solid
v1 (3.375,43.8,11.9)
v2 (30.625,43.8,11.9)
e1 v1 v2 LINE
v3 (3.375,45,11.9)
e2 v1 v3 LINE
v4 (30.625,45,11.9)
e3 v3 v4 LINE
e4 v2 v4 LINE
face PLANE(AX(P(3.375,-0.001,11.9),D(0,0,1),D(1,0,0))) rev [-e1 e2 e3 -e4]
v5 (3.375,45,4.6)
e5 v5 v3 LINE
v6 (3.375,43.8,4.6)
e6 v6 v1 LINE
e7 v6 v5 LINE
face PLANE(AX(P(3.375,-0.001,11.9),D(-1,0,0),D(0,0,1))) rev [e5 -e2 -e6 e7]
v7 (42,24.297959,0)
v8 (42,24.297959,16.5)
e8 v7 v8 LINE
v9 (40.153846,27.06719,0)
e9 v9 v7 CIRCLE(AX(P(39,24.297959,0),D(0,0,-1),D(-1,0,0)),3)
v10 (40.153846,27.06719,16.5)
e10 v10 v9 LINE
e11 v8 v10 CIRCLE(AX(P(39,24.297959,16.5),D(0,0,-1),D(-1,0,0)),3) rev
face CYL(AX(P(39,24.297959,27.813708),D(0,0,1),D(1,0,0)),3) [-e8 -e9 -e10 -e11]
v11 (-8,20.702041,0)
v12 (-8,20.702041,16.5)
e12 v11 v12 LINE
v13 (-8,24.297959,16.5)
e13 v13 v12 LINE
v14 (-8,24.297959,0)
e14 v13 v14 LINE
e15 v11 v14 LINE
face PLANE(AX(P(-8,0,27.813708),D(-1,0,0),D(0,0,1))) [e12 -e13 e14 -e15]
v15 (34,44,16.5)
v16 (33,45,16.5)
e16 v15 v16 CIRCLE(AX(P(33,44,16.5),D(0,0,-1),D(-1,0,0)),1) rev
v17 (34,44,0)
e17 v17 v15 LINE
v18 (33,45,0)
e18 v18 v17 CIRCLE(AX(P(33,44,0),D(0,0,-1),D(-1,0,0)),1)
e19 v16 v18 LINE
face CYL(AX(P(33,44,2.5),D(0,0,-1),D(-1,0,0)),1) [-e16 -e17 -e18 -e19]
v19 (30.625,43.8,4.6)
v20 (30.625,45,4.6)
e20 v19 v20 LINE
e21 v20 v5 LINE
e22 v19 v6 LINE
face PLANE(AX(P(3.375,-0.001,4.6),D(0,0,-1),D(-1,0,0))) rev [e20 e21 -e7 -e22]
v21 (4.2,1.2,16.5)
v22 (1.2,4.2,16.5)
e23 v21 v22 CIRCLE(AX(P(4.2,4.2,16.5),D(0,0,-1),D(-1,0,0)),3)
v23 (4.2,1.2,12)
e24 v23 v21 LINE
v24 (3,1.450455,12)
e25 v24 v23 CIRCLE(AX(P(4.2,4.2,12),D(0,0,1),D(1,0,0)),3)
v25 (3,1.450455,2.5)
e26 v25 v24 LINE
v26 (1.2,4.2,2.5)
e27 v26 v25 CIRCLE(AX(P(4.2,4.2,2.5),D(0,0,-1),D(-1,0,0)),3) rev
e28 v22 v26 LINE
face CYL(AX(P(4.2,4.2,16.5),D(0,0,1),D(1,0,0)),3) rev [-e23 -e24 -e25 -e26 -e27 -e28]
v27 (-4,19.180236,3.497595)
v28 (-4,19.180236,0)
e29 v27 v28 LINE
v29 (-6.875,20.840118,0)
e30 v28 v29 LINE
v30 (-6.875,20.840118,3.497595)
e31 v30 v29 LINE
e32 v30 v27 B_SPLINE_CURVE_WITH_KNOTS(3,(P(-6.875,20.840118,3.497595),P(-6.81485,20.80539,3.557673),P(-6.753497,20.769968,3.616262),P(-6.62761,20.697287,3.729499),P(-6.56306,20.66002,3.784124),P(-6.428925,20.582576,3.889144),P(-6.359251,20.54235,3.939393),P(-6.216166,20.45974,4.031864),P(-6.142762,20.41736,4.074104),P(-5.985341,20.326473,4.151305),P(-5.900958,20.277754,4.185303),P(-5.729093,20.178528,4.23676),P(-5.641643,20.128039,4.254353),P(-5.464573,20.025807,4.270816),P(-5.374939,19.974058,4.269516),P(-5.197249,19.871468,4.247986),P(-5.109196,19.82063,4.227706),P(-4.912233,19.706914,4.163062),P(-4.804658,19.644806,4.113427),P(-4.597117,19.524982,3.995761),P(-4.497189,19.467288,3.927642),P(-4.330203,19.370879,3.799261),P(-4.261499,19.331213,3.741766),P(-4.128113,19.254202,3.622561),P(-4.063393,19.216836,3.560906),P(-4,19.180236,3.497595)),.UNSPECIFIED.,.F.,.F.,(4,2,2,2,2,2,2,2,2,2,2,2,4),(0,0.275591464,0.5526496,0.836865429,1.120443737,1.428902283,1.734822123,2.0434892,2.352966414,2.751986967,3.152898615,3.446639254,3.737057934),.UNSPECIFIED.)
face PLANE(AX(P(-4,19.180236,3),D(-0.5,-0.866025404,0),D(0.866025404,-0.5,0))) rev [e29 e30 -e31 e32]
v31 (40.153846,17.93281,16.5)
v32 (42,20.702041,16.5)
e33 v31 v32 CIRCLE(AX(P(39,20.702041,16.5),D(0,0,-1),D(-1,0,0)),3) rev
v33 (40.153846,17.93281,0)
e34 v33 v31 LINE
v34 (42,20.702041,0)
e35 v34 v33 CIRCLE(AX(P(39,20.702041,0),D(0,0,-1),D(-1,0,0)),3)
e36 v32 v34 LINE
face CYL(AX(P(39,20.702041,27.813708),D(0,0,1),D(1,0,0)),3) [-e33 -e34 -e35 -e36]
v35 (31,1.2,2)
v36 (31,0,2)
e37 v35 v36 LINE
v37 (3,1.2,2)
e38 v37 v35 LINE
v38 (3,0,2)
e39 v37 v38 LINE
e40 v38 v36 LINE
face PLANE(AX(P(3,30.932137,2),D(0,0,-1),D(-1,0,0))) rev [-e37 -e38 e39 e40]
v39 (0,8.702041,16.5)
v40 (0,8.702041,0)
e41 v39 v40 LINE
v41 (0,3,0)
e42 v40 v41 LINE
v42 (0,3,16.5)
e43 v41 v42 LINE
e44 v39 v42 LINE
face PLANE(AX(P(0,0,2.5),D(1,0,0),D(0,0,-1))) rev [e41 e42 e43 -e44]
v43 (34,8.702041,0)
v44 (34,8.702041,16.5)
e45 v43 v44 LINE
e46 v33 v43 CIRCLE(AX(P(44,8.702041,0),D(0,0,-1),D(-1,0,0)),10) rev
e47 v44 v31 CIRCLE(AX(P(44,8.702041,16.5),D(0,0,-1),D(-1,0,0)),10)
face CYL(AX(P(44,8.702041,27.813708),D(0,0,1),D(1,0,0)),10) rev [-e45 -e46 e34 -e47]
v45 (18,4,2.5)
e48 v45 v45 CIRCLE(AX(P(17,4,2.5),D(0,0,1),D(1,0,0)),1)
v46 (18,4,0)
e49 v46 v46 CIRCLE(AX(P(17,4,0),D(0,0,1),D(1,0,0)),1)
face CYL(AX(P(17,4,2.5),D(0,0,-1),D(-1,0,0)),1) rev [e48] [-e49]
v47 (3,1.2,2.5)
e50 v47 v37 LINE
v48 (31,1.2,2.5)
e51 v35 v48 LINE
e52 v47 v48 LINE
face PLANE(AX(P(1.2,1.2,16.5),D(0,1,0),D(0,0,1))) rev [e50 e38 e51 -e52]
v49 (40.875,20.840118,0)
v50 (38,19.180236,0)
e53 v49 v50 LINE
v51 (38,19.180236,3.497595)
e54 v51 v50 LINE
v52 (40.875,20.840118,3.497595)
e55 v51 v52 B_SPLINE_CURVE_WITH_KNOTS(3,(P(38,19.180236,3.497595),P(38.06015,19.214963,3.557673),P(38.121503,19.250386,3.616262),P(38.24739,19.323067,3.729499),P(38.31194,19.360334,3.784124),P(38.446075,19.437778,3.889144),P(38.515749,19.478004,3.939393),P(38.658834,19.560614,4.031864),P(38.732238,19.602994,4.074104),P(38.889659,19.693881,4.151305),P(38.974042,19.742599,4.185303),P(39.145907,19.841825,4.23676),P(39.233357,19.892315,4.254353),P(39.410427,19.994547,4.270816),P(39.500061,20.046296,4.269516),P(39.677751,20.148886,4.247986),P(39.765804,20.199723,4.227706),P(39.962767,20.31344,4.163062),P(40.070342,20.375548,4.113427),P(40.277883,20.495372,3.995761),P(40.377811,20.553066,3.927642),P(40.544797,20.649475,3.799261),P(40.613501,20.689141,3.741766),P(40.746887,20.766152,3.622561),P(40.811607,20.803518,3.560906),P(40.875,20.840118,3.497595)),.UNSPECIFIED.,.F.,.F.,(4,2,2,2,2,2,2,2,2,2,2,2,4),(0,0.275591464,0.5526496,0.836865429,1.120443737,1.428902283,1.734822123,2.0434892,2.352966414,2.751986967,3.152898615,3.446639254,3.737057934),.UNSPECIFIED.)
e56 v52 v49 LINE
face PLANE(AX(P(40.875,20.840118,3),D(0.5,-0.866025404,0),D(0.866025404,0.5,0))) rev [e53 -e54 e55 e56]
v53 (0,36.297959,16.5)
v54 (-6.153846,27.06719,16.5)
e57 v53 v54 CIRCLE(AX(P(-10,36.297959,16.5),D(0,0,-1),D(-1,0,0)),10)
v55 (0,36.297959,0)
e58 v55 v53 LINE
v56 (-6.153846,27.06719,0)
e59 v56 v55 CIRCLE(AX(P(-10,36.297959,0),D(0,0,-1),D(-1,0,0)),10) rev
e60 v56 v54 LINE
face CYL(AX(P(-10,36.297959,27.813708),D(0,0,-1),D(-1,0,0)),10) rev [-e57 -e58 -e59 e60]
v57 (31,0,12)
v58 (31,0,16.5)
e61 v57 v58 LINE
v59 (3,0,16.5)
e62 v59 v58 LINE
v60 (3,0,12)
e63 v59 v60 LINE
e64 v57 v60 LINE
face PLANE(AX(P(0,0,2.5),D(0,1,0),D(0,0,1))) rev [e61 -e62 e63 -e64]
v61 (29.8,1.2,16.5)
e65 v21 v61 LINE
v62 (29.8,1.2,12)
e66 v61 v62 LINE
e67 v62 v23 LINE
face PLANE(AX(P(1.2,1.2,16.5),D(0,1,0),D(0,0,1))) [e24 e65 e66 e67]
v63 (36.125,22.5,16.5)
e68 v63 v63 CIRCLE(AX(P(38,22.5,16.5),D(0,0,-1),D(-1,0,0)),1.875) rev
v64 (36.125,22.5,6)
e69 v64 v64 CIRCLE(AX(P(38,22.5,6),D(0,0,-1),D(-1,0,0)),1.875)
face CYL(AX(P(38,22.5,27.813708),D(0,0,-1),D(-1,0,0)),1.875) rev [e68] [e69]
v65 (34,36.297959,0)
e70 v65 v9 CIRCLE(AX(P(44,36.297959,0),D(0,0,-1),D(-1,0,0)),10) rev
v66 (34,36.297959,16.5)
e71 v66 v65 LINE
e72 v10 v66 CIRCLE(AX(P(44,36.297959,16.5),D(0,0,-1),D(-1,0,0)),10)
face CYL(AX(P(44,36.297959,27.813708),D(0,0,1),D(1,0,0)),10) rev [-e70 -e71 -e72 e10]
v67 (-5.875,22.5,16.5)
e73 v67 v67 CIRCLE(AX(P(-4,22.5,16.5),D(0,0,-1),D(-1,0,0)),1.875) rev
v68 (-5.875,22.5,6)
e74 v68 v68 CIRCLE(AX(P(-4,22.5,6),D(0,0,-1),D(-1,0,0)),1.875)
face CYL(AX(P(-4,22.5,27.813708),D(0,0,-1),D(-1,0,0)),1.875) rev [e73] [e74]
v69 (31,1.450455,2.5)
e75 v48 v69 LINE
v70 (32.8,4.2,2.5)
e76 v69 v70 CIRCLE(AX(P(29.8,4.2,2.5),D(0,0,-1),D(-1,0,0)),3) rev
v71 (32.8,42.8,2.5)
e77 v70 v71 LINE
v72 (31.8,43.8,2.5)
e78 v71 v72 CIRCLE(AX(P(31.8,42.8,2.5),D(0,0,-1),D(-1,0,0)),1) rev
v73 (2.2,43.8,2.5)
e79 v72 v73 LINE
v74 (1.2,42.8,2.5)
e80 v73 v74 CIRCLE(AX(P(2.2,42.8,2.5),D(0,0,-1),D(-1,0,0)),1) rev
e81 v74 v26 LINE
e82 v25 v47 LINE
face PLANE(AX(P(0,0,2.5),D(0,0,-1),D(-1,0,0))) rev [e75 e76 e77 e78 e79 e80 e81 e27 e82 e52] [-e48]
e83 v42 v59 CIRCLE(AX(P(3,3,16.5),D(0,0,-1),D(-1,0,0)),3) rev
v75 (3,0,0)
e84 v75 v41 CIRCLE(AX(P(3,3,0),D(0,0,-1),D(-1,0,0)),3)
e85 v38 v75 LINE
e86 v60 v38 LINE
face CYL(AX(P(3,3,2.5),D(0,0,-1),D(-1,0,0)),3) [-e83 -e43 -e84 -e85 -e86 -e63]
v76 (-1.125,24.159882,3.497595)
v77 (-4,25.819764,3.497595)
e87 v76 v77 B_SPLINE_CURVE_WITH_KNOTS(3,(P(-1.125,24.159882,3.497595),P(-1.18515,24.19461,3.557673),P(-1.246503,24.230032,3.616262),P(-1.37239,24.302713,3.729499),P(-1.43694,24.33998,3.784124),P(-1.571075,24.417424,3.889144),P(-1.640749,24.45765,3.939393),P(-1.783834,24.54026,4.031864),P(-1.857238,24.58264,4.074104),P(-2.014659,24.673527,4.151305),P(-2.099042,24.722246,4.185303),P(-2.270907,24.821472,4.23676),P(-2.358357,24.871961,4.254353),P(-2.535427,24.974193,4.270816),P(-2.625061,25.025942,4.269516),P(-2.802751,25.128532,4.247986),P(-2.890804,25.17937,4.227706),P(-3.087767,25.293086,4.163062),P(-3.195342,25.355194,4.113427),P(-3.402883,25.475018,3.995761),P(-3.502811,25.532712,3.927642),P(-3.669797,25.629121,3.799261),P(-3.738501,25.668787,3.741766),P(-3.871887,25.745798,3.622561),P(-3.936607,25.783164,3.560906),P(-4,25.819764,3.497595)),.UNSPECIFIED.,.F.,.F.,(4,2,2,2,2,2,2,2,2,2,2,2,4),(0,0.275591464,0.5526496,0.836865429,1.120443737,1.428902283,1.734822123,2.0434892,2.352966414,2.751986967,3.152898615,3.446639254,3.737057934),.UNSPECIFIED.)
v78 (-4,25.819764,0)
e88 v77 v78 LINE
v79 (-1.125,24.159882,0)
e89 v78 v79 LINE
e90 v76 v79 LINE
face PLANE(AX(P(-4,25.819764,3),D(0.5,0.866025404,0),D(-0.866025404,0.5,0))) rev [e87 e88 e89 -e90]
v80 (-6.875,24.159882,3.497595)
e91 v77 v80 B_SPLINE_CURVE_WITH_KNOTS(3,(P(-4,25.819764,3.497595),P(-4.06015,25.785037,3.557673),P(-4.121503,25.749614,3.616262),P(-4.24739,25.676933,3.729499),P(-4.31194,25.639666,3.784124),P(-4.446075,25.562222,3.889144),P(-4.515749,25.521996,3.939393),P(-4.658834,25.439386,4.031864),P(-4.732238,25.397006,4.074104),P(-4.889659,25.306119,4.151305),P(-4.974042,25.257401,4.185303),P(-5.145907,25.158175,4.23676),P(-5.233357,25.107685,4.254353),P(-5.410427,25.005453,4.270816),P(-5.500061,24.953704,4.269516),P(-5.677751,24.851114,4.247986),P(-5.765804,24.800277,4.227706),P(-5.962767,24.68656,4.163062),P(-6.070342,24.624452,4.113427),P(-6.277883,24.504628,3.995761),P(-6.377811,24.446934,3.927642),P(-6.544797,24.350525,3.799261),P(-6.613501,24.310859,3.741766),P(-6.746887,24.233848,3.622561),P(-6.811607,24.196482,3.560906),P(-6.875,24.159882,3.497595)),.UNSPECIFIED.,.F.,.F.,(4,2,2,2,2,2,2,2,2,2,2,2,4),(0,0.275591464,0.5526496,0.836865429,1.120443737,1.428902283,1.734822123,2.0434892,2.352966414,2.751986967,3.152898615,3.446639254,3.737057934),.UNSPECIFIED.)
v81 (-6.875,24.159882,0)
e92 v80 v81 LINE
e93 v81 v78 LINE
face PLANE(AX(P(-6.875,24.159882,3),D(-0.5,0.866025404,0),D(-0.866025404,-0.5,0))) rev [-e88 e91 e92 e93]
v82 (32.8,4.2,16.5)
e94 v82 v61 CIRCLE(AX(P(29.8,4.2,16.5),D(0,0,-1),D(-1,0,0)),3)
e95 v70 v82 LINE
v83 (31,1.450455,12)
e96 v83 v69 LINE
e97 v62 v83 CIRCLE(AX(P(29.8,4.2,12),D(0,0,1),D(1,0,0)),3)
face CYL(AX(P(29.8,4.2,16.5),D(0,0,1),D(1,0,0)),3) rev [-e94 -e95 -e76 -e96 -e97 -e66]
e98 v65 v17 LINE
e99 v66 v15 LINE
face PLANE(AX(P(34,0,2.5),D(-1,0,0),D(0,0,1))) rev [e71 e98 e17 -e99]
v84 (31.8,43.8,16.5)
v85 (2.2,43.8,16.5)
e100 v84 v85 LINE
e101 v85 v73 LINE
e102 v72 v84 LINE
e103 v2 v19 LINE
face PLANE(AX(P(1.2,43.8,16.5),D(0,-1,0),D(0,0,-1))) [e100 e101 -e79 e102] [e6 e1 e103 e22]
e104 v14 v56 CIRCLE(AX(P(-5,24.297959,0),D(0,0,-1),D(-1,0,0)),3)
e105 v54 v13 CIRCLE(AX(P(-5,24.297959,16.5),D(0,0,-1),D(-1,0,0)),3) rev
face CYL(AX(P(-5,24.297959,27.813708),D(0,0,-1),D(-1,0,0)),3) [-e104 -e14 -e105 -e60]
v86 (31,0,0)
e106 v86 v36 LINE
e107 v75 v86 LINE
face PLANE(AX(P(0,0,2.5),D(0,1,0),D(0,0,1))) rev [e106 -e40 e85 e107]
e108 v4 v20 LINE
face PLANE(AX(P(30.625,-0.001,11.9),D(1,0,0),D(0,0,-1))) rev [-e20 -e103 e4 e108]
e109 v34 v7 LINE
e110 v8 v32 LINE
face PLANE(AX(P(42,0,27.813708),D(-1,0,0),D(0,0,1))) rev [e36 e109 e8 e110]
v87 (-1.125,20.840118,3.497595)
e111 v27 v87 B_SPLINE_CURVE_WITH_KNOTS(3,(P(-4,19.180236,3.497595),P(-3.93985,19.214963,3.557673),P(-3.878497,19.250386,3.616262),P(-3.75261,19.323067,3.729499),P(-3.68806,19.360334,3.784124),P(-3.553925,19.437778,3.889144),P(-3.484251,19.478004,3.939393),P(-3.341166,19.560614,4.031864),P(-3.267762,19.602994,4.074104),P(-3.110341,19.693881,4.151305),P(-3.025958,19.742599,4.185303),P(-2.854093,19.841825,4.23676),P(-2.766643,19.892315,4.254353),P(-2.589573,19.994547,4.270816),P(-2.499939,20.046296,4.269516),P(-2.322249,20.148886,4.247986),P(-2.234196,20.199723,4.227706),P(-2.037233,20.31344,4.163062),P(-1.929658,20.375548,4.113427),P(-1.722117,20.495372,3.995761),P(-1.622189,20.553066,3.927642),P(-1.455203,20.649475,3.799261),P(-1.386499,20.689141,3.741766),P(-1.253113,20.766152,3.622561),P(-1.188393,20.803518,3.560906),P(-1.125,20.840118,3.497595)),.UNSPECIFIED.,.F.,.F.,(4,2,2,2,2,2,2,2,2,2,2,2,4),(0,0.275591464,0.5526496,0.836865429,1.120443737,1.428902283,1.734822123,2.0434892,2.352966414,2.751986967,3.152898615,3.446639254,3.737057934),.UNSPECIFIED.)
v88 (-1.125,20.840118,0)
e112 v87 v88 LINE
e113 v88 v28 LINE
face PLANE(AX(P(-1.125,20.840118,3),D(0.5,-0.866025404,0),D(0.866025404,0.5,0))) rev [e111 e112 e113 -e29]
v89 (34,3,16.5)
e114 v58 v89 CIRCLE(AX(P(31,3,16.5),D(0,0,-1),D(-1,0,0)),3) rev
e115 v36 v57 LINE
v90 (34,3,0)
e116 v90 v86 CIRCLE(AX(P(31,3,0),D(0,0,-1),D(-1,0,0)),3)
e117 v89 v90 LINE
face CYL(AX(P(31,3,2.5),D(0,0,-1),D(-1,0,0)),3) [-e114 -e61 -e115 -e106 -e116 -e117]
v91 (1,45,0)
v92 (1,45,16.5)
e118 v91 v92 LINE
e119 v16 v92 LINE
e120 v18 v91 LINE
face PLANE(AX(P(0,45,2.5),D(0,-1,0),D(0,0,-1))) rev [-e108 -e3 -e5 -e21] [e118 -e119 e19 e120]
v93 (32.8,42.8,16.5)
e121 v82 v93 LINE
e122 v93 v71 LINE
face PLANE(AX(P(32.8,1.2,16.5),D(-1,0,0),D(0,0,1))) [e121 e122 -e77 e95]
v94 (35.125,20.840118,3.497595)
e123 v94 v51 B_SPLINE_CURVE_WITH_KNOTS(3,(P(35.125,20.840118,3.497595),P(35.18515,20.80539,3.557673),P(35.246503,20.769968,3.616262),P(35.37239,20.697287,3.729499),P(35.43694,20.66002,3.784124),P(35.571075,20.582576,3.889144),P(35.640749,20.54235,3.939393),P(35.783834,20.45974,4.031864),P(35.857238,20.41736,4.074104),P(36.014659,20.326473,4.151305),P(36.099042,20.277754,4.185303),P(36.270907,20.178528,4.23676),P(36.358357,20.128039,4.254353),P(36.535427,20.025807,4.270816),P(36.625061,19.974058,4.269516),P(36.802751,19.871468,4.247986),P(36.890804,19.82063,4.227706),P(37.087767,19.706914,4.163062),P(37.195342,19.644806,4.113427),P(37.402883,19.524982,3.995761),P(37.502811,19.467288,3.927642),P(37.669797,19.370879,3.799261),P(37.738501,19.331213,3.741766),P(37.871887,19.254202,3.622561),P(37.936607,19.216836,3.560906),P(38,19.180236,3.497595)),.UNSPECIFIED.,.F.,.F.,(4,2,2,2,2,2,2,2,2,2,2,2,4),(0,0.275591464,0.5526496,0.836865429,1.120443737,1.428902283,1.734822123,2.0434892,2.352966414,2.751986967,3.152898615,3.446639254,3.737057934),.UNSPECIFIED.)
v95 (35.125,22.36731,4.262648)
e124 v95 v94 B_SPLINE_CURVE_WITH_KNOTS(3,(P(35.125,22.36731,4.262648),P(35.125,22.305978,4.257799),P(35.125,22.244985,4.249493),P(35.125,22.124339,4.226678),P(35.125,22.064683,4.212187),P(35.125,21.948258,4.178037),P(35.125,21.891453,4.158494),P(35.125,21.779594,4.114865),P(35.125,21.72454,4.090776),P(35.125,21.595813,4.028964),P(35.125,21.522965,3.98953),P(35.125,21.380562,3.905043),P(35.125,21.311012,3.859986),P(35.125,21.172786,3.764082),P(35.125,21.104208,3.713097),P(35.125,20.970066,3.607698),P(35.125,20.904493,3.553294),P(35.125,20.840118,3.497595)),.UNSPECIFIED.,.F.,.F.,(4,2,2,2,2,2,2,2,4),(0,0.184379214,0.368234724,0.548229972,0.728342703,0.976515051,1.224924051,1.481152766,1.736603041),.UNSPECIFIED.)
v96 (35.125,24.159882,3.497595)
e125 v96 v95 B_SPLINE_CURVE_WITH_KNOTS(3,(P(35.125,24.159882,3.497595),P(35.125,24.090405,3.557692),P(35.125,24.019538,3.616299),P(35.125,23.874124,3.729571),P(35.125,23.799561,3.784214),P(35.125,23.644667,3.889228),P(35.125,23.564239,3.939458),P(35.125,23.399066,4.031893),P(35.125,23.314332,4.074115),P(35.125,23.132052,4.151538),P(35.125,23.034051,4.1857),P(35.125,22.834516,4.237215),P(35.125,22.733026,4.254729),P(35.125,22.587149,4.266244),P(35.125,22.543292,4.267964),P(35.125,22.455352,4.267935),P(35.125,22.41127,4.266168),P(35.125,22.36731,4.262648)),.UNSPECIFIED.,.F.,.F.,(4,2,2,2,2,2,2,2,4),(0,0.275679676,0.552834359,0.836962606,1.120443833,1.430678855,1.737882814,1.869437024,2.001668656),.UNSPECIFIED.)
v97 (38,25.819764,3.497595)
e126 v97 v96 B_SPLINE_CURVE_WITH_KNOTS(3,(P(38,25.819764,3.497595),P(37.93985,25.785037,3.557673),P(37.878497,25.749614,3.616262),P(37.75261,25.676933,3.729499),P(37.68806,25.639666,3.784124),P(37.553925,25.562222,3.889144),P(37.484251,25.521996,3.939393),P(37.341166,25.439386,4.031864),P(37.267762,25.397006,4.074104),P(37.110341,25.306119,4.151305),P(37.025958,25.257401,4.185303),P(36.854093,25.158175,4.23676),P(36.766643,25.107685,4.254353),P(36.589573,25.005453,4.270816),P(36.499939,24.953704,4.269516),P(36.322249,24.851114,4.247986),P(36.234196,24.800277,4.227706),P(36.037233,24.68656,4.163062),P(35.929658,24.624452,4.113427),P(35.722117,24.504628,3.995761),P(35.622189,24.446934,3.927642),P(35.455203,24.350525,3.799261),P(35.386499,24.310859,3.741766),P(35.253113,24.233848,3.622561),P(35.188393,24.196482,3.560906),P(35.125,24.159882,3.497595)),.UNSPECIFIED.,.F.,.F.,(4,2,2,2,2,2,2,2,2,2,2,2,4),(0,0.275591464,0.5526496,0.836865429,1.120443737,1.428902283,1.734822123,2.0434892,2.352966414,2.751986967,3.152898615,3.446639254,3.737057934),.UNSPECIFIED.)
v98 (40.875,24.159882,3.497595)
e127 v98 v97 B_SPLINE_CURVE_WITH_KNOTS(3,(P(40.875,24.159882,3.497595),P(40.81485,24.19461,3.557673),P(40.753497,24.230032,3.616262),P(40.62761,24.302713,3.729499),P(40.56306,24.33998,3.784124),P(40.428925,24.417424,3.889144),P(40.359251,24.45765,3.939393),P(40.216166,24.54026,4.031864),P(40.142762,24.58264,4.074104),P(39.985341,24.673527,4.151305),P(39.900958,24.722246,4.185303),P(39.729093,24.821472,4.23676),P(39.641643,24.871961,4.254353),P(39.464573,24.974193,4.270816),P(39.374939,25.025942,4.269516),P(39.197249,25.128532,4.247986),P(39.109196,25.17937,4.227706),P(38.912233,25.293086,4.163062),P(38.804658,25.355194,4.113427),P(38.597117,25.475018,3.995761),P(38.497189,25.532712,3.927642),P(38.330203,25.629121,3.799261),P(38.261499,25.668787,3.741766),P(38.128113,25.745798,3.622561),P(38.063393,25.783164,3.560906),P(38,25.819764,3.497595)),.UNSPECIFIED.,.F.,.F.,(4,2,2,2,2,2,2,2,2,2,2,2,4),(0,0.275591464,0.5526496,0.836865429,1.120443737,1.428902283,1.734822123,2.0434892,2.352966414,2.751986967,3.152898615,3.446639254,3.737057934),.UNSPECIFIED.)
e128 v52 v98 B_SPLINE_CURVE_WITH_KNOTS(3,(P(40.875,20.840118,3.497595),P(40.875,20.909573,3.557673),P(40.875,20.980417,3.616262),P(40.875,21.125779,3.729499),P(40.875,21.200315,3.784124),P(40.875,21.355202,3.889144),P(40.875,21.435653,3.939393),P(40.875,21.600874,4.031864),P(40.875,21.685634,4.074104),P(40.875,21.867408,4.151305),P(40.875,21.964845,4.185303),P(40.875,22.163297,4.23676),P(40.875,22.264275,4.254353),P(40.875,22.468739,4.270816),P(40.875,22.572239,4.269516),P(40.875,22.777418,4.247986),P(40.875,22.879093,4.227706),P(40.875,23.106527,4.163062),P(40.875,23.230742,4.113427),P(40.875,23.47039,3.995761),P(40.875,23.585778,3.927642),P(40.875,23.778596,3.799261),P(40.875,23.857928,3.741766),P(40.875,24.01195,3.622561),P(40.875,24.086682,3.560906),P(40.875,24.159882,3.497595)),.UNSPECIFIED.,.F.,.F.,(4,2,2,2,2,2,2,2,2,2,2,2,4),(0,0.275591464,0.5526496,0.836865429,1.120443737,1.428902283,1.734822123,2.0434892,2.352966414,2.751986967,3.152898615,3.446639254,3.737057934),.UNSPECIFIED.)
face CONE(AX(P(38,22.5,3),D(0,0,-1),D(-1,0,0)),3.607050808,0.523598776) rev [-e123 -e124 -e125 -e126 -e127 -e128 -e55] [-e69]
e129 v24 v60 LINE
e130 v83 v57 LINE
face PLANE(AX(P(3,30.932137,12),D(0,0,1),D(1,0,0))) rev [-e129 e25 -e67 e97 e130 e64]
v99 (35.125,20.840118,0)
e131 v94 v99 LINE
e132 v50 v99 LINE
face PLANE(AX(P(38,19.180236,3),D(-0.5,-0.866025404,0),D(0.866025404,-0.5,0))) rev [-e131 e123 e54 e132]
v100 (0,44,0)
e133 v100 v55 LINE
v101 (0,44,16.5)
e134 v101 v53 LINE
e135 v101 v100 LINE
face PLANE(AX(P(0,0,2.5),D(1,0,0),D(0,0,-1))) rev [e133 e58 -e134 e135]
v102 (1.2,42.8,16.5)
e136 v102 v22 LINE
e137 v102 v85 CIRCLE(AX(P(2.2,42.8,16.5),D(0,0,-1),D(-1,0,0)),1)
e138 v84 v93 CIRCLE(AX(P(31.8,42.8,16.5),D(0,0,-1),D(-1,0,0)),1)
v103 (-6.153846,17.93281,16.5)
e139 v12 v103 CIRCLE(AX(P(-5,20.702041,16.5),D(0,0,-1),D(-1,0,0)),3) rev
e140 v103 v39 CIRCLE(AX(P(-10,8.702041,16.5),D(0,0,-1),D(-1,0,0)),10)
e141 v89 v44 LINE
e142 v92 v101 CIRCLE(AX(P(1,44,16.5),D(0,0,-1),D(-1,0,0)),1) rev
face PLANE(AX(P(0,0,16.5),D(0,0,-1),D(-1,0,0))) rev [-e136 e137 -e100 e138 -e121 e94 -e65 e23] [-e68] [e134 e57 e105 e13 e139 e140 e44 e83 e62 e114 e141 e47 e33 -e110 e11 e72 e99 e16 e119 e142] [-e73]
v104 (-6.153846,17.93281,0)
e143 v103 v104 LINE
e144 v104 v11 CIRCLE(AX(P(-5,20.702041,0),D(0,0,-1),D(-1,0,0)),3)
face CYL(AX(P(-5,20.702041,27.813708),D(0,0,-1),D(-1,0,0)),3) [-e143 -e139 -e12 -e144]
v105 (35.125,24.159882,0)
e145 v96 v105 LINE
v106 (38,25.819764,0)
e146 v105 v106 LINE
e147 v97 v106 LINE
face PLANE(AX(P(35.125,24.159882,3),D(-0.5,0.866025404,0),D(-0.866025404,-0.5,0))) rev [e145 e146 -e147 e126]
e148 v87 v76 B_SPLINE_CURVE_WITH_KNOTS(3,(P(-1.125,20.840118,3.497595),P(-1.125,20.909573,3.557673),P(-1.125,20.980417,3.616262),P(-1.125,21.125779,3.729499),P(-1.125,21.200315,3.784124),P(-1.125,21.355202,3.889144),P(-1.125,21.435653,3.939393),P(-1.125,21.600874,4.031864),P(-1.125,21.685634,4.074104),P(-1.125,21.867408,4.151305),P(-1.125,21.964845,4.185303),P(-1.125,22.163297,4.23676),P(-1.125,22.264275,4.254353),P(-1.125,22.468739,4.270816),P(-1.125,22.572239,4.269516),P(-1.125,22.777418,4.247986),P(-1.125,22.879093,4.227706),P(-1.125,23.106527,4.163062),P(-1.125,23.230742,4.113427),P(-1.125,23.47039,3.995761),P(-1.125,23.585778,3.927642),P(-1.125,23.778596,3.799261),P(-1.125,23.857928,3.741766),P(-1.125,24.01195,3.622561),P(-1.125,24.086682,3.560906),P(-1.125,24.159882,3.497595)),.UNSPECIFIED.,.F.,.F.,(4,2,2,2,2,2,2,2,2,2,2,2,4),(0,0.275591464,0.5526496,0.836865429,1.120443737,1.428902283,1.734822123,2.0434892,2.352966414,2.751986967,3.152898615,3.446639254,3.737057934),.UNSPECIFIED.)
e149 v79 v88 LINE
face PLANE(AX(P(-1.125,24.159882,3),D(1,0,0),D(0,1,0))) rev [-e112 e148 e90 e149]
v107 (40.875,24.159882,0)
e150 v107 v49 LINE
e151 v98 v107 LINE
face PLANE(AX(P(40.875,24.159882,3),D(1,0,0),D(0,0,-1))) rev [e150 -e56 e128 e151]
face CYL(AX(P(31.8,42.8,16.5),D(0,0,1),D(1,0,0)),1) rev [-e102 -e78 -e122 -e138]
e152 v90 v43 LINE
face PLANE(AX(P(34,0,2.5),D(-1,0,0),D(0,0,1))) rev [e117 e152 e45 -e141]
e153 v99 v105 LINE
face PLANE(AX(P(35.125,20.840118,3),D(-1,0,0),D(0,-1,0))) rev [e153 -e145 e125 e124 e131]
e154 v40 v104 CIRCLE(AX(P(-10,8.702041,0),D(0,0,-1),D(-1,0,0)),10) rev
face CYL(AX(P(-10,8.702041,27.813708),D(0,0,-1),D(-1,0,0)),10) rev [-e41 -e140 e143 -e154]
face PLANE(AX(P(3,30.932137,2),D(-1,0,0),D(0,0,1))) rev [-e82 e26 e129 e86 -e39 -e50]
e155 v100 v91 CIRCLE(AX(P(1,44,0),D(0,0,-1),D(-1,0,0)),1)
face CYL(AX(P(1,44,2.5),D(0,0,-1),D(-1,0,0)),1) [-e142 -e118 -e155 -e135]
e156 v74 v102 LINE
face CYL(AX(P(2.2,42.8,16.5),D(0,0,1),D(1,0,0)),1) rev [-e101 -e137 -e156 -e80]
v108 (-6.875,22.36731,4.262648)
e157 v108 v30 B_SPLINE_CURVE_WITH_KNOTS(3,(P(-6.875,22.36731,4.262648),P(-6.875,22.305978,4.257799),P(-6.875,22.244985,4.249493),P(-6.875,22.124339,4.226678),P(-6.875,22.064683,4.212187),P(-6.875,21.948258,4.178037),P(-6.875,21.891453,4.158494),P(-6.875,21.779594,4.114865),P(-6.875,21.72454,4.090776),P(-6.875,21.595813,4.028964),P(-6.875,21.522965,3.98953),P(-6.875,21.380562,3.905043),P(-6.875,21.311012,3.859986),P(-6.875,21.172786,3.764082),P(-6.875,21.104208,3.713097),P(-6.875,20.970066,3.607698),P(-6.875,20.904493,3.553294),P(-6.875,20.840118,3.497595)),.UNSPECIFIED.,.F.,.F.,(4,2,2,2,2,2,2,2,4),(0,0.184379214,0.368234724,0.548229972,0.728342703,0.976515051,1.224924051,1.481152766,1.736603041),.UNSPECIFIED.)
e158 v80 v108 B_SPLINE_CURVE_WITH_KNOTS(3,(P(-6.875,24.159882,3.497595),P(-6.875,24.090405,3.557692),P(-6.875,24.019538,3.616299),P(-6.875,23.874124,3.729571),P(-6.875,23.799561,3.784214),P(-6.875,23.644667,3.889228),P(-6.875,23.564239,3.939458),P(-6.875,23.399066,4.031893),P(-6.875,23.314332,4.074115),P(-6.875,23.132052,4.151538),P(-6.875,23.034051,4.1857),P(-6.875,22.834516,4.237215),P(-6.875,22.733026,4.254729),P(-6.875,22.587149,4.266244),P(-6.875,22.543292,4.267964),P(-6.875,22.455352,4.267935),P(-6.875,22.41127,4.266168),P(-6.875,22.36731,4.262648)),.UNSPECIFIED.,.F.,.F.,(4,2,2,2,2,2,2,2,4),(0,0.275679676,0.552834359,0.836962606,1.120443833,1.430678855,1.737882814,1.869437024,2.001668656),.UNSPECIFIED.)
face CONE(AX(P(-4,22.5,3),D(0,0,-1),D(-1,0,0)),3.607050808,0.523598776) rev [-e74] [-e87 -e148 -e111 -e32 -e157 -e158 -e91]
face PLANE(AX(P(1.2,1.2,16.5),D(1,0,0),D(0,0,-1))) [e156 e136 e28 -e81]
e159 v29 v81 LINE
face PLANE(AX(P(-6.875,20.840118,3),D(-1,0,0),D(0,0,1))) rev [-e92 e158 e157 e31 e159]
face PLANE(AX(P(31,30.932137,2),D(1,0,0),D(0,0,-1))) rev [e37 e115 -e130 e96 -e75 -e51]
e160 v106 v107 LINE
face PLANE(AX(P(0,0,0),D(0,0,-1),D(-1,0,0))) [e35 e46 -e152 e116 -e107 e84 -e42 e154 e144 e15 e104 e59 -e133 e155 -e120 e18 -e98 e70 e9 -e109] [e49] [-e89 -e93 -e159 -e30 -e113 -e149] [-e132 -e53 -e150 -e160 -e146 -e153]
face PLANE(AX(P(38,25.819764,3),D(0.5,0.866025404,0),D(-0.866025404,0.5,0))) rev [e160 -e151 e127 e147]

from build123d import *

# Parameters (mm, degrees)
SKETCH1_W           = 34
SKETCH1_H           = 45
SKETCH1_R           = 1
BOSS_EXTRUDE1_DEPTH = 2.5
SKETCH2_W           = 34
SKETCH2_H           = 45
SKETCH2_W_2         = 31.6
SKETCH2_H_2         = 42.6
BOSS_EXTRUDE2_DEPTH = 14
SKETCH7_W           = 28
SKETCH7_H           = 10
CUT_EXTRUDE2_DEPTH  = 1.2
CUT_EXTRUDE3_REACH  = 60.764
SKETCH9_W           = 27.25
SKETCH9_H           = 7.3
SKETCH10_W          = 8
SKETCH10_H          = 8
SKETCH10_R          = 1.875
BOSS_EXTRUDE3_DEPTH = 16.5
FILLET1_R           = 10
FILLET2_R           = 3
FILLET3_R           = 1
CUT_EXTRUDE4_DEPTH  = 3
CHAMFER1_SIZE       = 3
CHAMFER1_SIZE_2     = 1.732050808


with BuildPart() as part:
    # Sketch1 → Boss-Extrude1 (new body)
    with BuildSketch(Plane.XY):
        with Locations((17, 22.5)):
            Rectangle(SKETCH1_W, SKETCH1_H)
        with Locations((17, 4)):
            Circle(SKETCH1_R, mode=Mode.SUBTRACT)
    extrude(amount=BOSS_EXTRUDE1_DEPTH)

    # Sketch2 → Boss-Extrude2 (add)
    with BuildSketch(Plane.XY.offset(2.5)):
        with Locations((17, 22.5)):
            Rectangle(SKETCH2_W, SKETCH2_H)
        with Locations((17, 22.5)):
            Rectangle(SKETCH2_W_2, SKETCH2_H_2, mode=Mode.SUBTRACT)
    extrude(amount=BOSS_EXTRUDE2_DEPTH)

    # Sketch7 → Cut-Extrude2 (cut)
    with BuildSketch(Plane(origin=(0, 0, 0), x_dir=(-1, 0, 0), z_dir=(0, -1, 0))):
        with Locations((-17, -7)):
            Rectangle(SKETCH7_W, SKETCH7_H)
    extrude(amount=-CUT_EXTRUDE2_DEPTH, mode=Mode.SUBTRACT)

    # Sketch9 → Cut-Extrude3 (cut, up to next)
    with BuildSketch(Plane(origin=(0, 45, 0), x_dir=(1, 0, 0), z_dir=(0, 1, 0)), mode=Mode.PRIVATE) as cut_extrude3_sk1:
        with Locations((17, -8.25)):
            Rectangle(SKETCH9_W, SKETCH9_H)
    cut_extrude3_tool1 = extrude(cut_extrude3_sk1.sketch, amount=-CUT_EXTRUDE3_REACH, mode=Mode.PRIVATE) & part.part
    add(cut_extrude3_tool1.solids().sort_by_distance((17, 45, 8.25))[0], mode=Mode.SUBTRACT)

    # Sketch10 → Boss-Extrude3 (add)
    # profile 1 of 2: a face of its own
    with BuildSketch(Plane(origin=(0, 0, 0), x_dir=(-1, 0, 0), z_dir=(0, 0, -1))):
        with Locations((-38, 22.5)):
            Rectangle(SKETCH10_W, SKETCH10_H)
        with Locations((-38, 22.5)):
            Circle(SKETCH10_R, mode=Mode.SUBTRACT)
    # profile 2 of 2: a face of its own
    with BuildSketch(Plane(origin=(0, 0, 0), x_dir=(-1, 0, 0), z_dir=(0, 0, -1))):
        with Locations((4, 22.5)):
            Rectangle(SKETCH10_W, SKETCH10_H)
        with Locations((4, 22.5)):
            Circle(SKETCH10_R, mode=Mode.SUBTRACT)
    extrude(amount=-BOSS_EXTRUDE3_DEPTH)

    # Fillet1
    # the kernel refuses this fillet: 10 mm, written as the material it adds along each edge
    with BuildSketch(Plane(origin=(34, 26.5, 0), x_dir=(0, 1, 0), z_dir=(0, 0, 1)), Plane(origin=(0, 18.5, 0), x_dir=(0, -1, 0), z_dir=(0, 0, 1))) as fillet1_piece_1:
        with BuildLine():
            CenterArc((9.797958971, -10), FILLET1_R, 90, 78.463040967)
            Line((0, -8), (-0.195959179, -7.96))
            ThreePointArc((-0.195959179, -7.96), (-0.2, -4), (-0.2, 0))
            Line((-0.2, 0), (0, 0.2))
            Line((0, 0.2), (9.797958971, 0.2))
            Line((9.797958971, 0.2), (9.797958971, 0))
        make_face()
    extrude(amount=16.5)
    with BuildSketch(Plane(origin=(34, 18.5, 0), x_dir=(0, -1, 0), z_dir=(0, 0, 1)), Plane(origin=(0, 26.5, 0), x_dir=(0, 1, 0), z_dir=(0, 0, 1))) as fillet1_piece_2:
        with BuildLine():
            CenterArc((9.797958971, 10), FILLET1_R, 191.536959033, 78.463040967)
            Line((0, 8), (-0.195959179, 7.96))
            ThreePointArc((-0.195959179, 7.96), (-0.2, 4), (-0.2, 0))
            Line((-0.2, 0), (0, -0.2))
            Line((0, -0.2), (9.797958971, -0.2))
            Line((9.797958971, -0.2), (9.797958971, 0))
        make_face()
    extrude(amount=16.5)

    # Fillet2
    # the kernel refuses this fillet: 3 mm, written as the material it adds along each edge
    with BuildSketch(Plane(origin=(32.8, 1.2, 2.5), x_dir=(-1, 0, 0), z_dir=(0, 0, 1))) as fillet2_piece_1_section:
        with BuildLine():
            CenterArc((FILLET2_R, -FILLET2_R), FILLET2_R, 90, 90)
            Line((0, -FILLET2_R), (0, 0))
            Line((0, 0), (FILLET2_R, 0))
        make_face()
    fillet2_piece_1 = extrude(amount=14, mode=Mode.PRIVATE)
    fillet2_piece_1 = split(fillet2_piece_1, bisect_by=Plane(origin=(31, 1.931235527, 7.25), z_dir=(1, 0, 0)), keep=Keep.TOP, mode=Mode.PRIVATE)
    fillet2_piece_1 = split(fillet2_piece_1, bisect_by=Plane(origin=(32.244849809, 1.931235527, 12), z_dir=(0, 0, -1)), keep=Keep.TOP, mode=Mode.PRIVATE)
    add(fillet2_piece_1)
    with BuildSketch(Plane(origin=(32.8, 1.2, 2.5), x_dir=(-1, 0, 0), z_dir=(0, 0, 1))) as fillet2_piece_2_section:
        with BuildLine():
            CenterArc((FILLET2_R, -FILLET2_R), FILLET2_R, 90, 90)
            Line((0, -FILLET2_R), (0, 0))
            Line((0, 0), (FILLET2_R, 0))
        make_face()
    fillet2_piece_2 = extrude(amount=14, mode=Mode.PRIVATE)
    fillet2_piece_2 = split(fillet2_piece_2, bisect_by=Plane(origin=(31, 1.230395544, 14.25), z_dir=(-1, 0, 0)), keep=Keep.TOP, mode=Mode.PRIVATE)
    fillet2_piece_2 = split(fillet2_piece_2, bisect_by=Plane(origin=(30.574754002, 1.230395544, 12), z_dir=(0, 0, 1)), keep=Keep.TOP, mode=Mode.PRIVATE)
    add(fillet2_piece_2)
    with BuildSketch(Plane(origin=(32.8, 1.2, 2.5), x_dir=(-1, 0, 0), z_dir=(0, 0, 1))) as fillet2_piece_3_section:
        with BuildLine():
            CenterArc((FILLET2_R, -FILLET2_R), FILLET2_R, 90, 90)
            Line((0, -FILLET2_R), (0, 0))
            Line((0, 0), (FILLET2_R, 0))
        make_face()
    fillet2_piece_3 = extrude(amount=14, mode=Mode.PRIVATE)
    fillet2_piece_3 = split(fillet2_piece_3, bisect_by=Plane(origin=(31, 1.931235527, 14.25), z_dir=(1, 0, 0)), keep=Keep.TOP, mode=Mode.PRIVATE)
    fillet2_piece_3 = split(fillet2_piece_3, bisect_by=Plane(origin=(32.244849809, 1.931235527, 12), z_dir=(0, 0, 1)), keep=Keep.TOP, mode=Mode.PRIVATE)
    add(fillet2_piece_3)
    with BuildSketch(Plane(origin=(1.2, 1.2, 2.5), x_dir=(0, 1, 0), z_dir=(0, 0, 1))) as fillet2_piece_4_section:
        with BuildLine():
            CenterArc((FILLET2_R, -FILLET2_R), FILLET2_R, 90, 90)
            Line((0, -FILLET2_R), (0, 0))
            Line((0, 0), (FILLET2_R, 0))
        make_face()
    fillet2_piece_4 = extrude(amount=14, mode=Mode.PRIVATE)
    fillet2_piece_4 = split(fillet2_piece_4, bisect_by=Plane(origin=(1.755150191, 1.931235527, 12), z_dir=(0, 0, -1)), keep=Keep.TOP, mode=Mode.PRIVATE)
    fillet2_piece_4 = split(fillet2_piece_4, bisect_by=Plane(origin=(3, 1.931235527, 7.25), z_dir=(-1, 0, 0)), keep=Keep.TOP, mode=Mode.PRIVATE)
    add(fillet2_piece_4)
    with BuildSketch(Plane(origin=(1.2, 1.2, 2.5), x_dir=(0, 1, 0), z_dir=(0, 0, 1))) as fillet2_piece_5_section:
        with BuildLine():
            CenterArc((FILLET2_R, -FILLET2_R), FILLET2_R, 90, 90)
            Line((0, -FILLET2_R), (0, 0))
            Line((0, 0), (FILLET2_R, 0))
        make_face()
    fillet2_piece_5 = extrude(amount=14, mode=Mode.PRIVATE)
    fillet2_piece_5 = split(fillet2_piece_5, bisect_by=Plane(origin=(1.755150191, 1.931235527, 12), z_dir=(0, 0, 1)), keep=Keep.TOP, mode=Mode.PRIVATE)
    fillet2_piece_5 = split(fillet2_piece_5, bisect_by=Plane(origin=(3, 1.931235527, 14.25), z_dir=(-1, 0, 0)), keep=Keep.TOP, mode=Mode.PRIVATE)
    add(fillet2_piece_5)
    with BuildSketch(Plane(origin=(1.2, 1.2, 2.5), x_dir=(0, 1, 0), z_dir=(0, 0, 1))) as fillet2_piece_6_section:
        with BuildLine():
            CenterArc((FILLET2_R, -FILLET2_R), FILLET2_R, 90, 90)
            Line((0, -FILLET2_R), (0, 0))
            Line((0, 0), (FILLET2_R, 0))
        make_face()
    fillet2_piece_6 = extrude(amount=14, mode=Mode.PRIVATE)
    fillet2_piece_6 = split(fillet2_piece_6, bisect_by=Plane(origin=(3.425245998, 1.230395544, 12), z_dir=(0, 0, 1)), keep=Keep.TOP, mode=Mode.PRIVATE)
    fillet2_piece_6 = split(fillet2_piece_6, bisect_by=Plane(origin=(3, 1.230395544, 14.25), z_dir=(1, 0, 0)), keep=Keep.TOP, mode=Mode.PRIVATE)
    add(fillet2_piece_6)
    # the kernel refuses this fillet: 3 mm, written as the material it takes off along each edge
    with BuildSketch(Plane(origin=(34, 0, -7.5), x_dir=(-1, 0, 0), z_dir=(0, 0, 1))) as fillet2_2_piece_1:
        with BuildLine():
            CenterArc((FILLET2_R, -FILLET2_R), FILLET2_R, 90, 90)
            Line((0, -FILLET2_R), (0, 0))
            Line((0, 0), (FILLET2_R, 0))
        make_face()
    extrude(amount=31.5, mode=Mode.SUBTRACT)
    with BuildSketch(Plane(origin=(0, 0, 24), x_dir=(0, 1, 0), z_dir=(0, 0, -1))) as fillet2_2_piece_2:
        with BuildLine():
            CenterArc((FILLET2_R, FILLET2_R), FILLET2_R, 180, 90)
            Line((0, FILLET2_R), (0, 0))
            Line((0, 0), (FILLET2_R, 0))
        make_face()
    extrude(amount=31.5, mode=Mode.SUBTRACT)
    with BuildSketch(Plane(origin=(42, 26.5, -5.505102572), x_dir=(-0.9559037360078775, 0.2936801789126771, 0), z_dir=(0, 0, 1))) as fillet2_2_piece_3:
        with BuildLine():
            CenterArc((2.221015405, 2.985979783), FILLET2_R, 197.07841199, 67.380135052)
            Line((-0.646695803, 2.104939246), (0, 0))
            ThreePointArc((0, 0), (0.965658872, 0.046734056), (1.931317743, 0))
        make_face()
    extrude(amount=27.510205144, mode=Mode.SUBTRACT)
    with BuildSketch(Plane(origin=(42, 18.5, -5.505102572), x_dir=(-0.9559037360078775, -0.2936801789126771, 0), z_dir=(0, 0, 1)), Plane(origin=(-8, 26.5, -5.505102572), x_dir=(0.9559037360078771, 0.29368017891267806, 0), z_dir=(0, 0, 1))) as fillet2_2_piece_4:
        with BuildLine():
            CenterArc((2.221015405, -2.985979783), FILLET2_R, 95.541452958, 67.380135052)
            Line((-0.646695803, -2.104939246), (0, 0))
            ThreePointArc((0, 0), (0.965658872, -0.046734056), (1.931317743, 0))
        make_face()
    extrude(amount=27.510205144, mode=Mode.SUBTRACT)
    with BuildSketch(Plane(origin=(-8, 18.5, -5.505102572), x_dir=(0, 1, 0), z_dir=(0, 0, 1))) as fillet2_2_piece_5:
        with BuildLine():
            CenterArc((2.202041029, -3), FILLET2_R, 90, 67.380135052)
            ThreePointArc((-0.56718974, -1.846153846), (-0.238921611, -0.936801789), (0, 0))
            Line((0, 0), (2.202041029, 0))
        make_face()
    extrude(amount=27.510205144, mode=Mode.SUBTRACT)

    # Fillet3
    fillet3_edges = [part.edges().sort_by_distance(p)[0] for p in [
        (32.8, 43.8, 9.5),
        (1.2, 43.8, 9.5),
        (34, 45, 8.25),
        (0, 45, 8.25),
    ]]
    fillet(fillet3_edges, radius=FILLET3_R)

    # Sketch11 → Cut-Extrude4 (cut)
    with BuildSketch(Plane(origin=(0, 0, 0), x_dir=(-1, 0, 0), z_dir=(0, 0, -1))):
        Polygon((-38, 19.180235952), (-35.125, 20.840117976), (-35.125, 24.159882024), (-38, 25.819764048), (-40.875, 24.159882024), (-40.875, 20.840117976), align=None)
        Polygon((4, 19.180235952), (6.875, 20.840117976), (6.875, 24.159882024), (4, 25.819764048), (1.125, 24.159882024), (1.125, 20.840117976), align=None)
    extrude(amount=-CUT_EXTRUDE4_DEPTH, mode=Mode.SUBTRACT)

    # Chamfer1
    # the kernel refuses this chamfer: 3, 1.732050808 mm, written as the material it takes off along each edge
    with BuildSketch(Plane(origin=(-4, 22.5, 3), x_dir=(-1, 0, 0), z_dir=(0, -1, 0))) as chamfer1_piece_1_section:
        Polygon((1.875, -CHAMFER1_SIZE), (1.875 + CHAMFER1_SIZE_2, 0), (1.875, 0), align=None)
    chamfer1_piece_1 = revolve(axis=Axis((-4, 22.5, 3), (0, 0, -1)), mode=Mode.PRIVATE)
    chamfer1_piece_1 = split(chamfer1_piece_1, bisect_by=Plane(origin=(-3.533643531, 18.910984919, 4.784069844), z_dir=(0.5000000000000003, 0.8660254037844387, 0)), keep=Keep.TOP, mode=Mode.PRIVATE)
    chamfer1_piece_1 = split(chamfer1_piece_1, bisect_by=Plane(origin=(-6.875, 22.5, 4.784069844), z_dir=(1, 0, 0)), keep=Keep.TOP, mode=Mode.PRIVATE)
    chamfer1_piece_1 = split(chamfer1_piece_1, bisect_by=Plane(origin=(-3.533643531, 26.089015081, 4.784069844), z_dir=(0.4999999999999998, -0.8660254037844388, 0)), keep=Keep.TOP, mode=Mode.PRIVATE)
    chamfer1_piece_1 = split(chamfer1_piece_1, bisect_by=Plane(origin=(-0.658643531, 23.890630991, 4.784069844), z_dir=(-0.5000000000000004, -0.8660254037844385, 0)), keep=Keep.TOP, mode=Mode.PRIVATE)
    chamfer1_piece_1 = split(chamfer1_piece_1, bisect_by=Plane(origin=(-1.125, 22.5, 4.784069844), z_dir=(-1, 0, 0)), keep=Keep.TOP, mode=Mode.PRIVATE)
    chamfer1_piece_1 = split(chamfer1_piece_1, bisect_by=Plane(origin=(-0.658643531, 21.109369009, 4.784069844), z_dir=(-0.5000000000000008, 0.8660254037844383, 0)), keep=Keep.TOP, mode=Mode.PRIVATE)
    add(chamfer1_piece_1, mode=Mode.SUBTRACT)
    with BuildSketch(Plane(origin=(38, 22.5, 3), x_dir=(-1, 0, 0), z_dir=(0, -1, 0))) as chamfer1_piece_2_section:
        Polygon((1.875, -CHAMFER1_SIZE), (1.875 + CHAMFER1_SIZE_2, 0), (1.875, 0), align=None)
    chamfer1_piece_2 = revolve(axis=Axis((38, 22.5, 3), (0, 0, -1)), mode=Mode.PRIVATE)
    chamfer1_piece_2 = split(chamfer1_piece_2, bisect_by=Plane(origin=(38.466356469, 18.910984919, 4.784069844), z_dir=(0.5000000000000004, 0.8660254037844385, 0)), keep=Keep.TOP, mode=Mode.PRIVATE)
    chamfer1_piece_2 = split(chamfer1_piece_2, bisect_by=Plane(origin=(35.125, 22.5, 4.784069844), z_dir=(1, 0, 0)), keep=Keep.TOP, mode=Mode.PRIVATE)
    chamfer1_piece_2 = split(chamfer1_piece_2, bisect_by=Plane(origin=(38.466356469, 26.089015081, 4.784069844), z_dir=(0.4999999999999988, -0.8660254037844394, 0)), keep=Keep.TOP, mode=Mode.PRIVATE)
    chamfer1_piece_2 = split(chamfer1_piece_2, bisect_by=Plane(origin=(41.341356469, 23.890630991, 4.784069844), z_dir=(-0.5000000000000002, -0.8660254037844386, 0)), keep=Keep.TOP, mode=Mode.PRIVATE)
    chamfer1_piece_2 = split(chamfer1_piece_2, bisect_by=Plane(origin=(40.875, 22.5, 4.784069844), z_dir=(-1, 0, 0)), keep=Keep.TOP, mode=Mode.PRIVATE)
    chamfer1_piece_2 = split(chamfer1_piece_2, bisect_by=Plane(origin=(41.341356469, 21.109369009, 4.784069844), z_dir=(-0.4999999999999996, 0.8660254037844389, 0)), keep=Keep.TOP, mode=Mode.PRIVATE)
    add(chamfer1_piece_2, mode=Mode.SUBTRACT)


solid = part.part
